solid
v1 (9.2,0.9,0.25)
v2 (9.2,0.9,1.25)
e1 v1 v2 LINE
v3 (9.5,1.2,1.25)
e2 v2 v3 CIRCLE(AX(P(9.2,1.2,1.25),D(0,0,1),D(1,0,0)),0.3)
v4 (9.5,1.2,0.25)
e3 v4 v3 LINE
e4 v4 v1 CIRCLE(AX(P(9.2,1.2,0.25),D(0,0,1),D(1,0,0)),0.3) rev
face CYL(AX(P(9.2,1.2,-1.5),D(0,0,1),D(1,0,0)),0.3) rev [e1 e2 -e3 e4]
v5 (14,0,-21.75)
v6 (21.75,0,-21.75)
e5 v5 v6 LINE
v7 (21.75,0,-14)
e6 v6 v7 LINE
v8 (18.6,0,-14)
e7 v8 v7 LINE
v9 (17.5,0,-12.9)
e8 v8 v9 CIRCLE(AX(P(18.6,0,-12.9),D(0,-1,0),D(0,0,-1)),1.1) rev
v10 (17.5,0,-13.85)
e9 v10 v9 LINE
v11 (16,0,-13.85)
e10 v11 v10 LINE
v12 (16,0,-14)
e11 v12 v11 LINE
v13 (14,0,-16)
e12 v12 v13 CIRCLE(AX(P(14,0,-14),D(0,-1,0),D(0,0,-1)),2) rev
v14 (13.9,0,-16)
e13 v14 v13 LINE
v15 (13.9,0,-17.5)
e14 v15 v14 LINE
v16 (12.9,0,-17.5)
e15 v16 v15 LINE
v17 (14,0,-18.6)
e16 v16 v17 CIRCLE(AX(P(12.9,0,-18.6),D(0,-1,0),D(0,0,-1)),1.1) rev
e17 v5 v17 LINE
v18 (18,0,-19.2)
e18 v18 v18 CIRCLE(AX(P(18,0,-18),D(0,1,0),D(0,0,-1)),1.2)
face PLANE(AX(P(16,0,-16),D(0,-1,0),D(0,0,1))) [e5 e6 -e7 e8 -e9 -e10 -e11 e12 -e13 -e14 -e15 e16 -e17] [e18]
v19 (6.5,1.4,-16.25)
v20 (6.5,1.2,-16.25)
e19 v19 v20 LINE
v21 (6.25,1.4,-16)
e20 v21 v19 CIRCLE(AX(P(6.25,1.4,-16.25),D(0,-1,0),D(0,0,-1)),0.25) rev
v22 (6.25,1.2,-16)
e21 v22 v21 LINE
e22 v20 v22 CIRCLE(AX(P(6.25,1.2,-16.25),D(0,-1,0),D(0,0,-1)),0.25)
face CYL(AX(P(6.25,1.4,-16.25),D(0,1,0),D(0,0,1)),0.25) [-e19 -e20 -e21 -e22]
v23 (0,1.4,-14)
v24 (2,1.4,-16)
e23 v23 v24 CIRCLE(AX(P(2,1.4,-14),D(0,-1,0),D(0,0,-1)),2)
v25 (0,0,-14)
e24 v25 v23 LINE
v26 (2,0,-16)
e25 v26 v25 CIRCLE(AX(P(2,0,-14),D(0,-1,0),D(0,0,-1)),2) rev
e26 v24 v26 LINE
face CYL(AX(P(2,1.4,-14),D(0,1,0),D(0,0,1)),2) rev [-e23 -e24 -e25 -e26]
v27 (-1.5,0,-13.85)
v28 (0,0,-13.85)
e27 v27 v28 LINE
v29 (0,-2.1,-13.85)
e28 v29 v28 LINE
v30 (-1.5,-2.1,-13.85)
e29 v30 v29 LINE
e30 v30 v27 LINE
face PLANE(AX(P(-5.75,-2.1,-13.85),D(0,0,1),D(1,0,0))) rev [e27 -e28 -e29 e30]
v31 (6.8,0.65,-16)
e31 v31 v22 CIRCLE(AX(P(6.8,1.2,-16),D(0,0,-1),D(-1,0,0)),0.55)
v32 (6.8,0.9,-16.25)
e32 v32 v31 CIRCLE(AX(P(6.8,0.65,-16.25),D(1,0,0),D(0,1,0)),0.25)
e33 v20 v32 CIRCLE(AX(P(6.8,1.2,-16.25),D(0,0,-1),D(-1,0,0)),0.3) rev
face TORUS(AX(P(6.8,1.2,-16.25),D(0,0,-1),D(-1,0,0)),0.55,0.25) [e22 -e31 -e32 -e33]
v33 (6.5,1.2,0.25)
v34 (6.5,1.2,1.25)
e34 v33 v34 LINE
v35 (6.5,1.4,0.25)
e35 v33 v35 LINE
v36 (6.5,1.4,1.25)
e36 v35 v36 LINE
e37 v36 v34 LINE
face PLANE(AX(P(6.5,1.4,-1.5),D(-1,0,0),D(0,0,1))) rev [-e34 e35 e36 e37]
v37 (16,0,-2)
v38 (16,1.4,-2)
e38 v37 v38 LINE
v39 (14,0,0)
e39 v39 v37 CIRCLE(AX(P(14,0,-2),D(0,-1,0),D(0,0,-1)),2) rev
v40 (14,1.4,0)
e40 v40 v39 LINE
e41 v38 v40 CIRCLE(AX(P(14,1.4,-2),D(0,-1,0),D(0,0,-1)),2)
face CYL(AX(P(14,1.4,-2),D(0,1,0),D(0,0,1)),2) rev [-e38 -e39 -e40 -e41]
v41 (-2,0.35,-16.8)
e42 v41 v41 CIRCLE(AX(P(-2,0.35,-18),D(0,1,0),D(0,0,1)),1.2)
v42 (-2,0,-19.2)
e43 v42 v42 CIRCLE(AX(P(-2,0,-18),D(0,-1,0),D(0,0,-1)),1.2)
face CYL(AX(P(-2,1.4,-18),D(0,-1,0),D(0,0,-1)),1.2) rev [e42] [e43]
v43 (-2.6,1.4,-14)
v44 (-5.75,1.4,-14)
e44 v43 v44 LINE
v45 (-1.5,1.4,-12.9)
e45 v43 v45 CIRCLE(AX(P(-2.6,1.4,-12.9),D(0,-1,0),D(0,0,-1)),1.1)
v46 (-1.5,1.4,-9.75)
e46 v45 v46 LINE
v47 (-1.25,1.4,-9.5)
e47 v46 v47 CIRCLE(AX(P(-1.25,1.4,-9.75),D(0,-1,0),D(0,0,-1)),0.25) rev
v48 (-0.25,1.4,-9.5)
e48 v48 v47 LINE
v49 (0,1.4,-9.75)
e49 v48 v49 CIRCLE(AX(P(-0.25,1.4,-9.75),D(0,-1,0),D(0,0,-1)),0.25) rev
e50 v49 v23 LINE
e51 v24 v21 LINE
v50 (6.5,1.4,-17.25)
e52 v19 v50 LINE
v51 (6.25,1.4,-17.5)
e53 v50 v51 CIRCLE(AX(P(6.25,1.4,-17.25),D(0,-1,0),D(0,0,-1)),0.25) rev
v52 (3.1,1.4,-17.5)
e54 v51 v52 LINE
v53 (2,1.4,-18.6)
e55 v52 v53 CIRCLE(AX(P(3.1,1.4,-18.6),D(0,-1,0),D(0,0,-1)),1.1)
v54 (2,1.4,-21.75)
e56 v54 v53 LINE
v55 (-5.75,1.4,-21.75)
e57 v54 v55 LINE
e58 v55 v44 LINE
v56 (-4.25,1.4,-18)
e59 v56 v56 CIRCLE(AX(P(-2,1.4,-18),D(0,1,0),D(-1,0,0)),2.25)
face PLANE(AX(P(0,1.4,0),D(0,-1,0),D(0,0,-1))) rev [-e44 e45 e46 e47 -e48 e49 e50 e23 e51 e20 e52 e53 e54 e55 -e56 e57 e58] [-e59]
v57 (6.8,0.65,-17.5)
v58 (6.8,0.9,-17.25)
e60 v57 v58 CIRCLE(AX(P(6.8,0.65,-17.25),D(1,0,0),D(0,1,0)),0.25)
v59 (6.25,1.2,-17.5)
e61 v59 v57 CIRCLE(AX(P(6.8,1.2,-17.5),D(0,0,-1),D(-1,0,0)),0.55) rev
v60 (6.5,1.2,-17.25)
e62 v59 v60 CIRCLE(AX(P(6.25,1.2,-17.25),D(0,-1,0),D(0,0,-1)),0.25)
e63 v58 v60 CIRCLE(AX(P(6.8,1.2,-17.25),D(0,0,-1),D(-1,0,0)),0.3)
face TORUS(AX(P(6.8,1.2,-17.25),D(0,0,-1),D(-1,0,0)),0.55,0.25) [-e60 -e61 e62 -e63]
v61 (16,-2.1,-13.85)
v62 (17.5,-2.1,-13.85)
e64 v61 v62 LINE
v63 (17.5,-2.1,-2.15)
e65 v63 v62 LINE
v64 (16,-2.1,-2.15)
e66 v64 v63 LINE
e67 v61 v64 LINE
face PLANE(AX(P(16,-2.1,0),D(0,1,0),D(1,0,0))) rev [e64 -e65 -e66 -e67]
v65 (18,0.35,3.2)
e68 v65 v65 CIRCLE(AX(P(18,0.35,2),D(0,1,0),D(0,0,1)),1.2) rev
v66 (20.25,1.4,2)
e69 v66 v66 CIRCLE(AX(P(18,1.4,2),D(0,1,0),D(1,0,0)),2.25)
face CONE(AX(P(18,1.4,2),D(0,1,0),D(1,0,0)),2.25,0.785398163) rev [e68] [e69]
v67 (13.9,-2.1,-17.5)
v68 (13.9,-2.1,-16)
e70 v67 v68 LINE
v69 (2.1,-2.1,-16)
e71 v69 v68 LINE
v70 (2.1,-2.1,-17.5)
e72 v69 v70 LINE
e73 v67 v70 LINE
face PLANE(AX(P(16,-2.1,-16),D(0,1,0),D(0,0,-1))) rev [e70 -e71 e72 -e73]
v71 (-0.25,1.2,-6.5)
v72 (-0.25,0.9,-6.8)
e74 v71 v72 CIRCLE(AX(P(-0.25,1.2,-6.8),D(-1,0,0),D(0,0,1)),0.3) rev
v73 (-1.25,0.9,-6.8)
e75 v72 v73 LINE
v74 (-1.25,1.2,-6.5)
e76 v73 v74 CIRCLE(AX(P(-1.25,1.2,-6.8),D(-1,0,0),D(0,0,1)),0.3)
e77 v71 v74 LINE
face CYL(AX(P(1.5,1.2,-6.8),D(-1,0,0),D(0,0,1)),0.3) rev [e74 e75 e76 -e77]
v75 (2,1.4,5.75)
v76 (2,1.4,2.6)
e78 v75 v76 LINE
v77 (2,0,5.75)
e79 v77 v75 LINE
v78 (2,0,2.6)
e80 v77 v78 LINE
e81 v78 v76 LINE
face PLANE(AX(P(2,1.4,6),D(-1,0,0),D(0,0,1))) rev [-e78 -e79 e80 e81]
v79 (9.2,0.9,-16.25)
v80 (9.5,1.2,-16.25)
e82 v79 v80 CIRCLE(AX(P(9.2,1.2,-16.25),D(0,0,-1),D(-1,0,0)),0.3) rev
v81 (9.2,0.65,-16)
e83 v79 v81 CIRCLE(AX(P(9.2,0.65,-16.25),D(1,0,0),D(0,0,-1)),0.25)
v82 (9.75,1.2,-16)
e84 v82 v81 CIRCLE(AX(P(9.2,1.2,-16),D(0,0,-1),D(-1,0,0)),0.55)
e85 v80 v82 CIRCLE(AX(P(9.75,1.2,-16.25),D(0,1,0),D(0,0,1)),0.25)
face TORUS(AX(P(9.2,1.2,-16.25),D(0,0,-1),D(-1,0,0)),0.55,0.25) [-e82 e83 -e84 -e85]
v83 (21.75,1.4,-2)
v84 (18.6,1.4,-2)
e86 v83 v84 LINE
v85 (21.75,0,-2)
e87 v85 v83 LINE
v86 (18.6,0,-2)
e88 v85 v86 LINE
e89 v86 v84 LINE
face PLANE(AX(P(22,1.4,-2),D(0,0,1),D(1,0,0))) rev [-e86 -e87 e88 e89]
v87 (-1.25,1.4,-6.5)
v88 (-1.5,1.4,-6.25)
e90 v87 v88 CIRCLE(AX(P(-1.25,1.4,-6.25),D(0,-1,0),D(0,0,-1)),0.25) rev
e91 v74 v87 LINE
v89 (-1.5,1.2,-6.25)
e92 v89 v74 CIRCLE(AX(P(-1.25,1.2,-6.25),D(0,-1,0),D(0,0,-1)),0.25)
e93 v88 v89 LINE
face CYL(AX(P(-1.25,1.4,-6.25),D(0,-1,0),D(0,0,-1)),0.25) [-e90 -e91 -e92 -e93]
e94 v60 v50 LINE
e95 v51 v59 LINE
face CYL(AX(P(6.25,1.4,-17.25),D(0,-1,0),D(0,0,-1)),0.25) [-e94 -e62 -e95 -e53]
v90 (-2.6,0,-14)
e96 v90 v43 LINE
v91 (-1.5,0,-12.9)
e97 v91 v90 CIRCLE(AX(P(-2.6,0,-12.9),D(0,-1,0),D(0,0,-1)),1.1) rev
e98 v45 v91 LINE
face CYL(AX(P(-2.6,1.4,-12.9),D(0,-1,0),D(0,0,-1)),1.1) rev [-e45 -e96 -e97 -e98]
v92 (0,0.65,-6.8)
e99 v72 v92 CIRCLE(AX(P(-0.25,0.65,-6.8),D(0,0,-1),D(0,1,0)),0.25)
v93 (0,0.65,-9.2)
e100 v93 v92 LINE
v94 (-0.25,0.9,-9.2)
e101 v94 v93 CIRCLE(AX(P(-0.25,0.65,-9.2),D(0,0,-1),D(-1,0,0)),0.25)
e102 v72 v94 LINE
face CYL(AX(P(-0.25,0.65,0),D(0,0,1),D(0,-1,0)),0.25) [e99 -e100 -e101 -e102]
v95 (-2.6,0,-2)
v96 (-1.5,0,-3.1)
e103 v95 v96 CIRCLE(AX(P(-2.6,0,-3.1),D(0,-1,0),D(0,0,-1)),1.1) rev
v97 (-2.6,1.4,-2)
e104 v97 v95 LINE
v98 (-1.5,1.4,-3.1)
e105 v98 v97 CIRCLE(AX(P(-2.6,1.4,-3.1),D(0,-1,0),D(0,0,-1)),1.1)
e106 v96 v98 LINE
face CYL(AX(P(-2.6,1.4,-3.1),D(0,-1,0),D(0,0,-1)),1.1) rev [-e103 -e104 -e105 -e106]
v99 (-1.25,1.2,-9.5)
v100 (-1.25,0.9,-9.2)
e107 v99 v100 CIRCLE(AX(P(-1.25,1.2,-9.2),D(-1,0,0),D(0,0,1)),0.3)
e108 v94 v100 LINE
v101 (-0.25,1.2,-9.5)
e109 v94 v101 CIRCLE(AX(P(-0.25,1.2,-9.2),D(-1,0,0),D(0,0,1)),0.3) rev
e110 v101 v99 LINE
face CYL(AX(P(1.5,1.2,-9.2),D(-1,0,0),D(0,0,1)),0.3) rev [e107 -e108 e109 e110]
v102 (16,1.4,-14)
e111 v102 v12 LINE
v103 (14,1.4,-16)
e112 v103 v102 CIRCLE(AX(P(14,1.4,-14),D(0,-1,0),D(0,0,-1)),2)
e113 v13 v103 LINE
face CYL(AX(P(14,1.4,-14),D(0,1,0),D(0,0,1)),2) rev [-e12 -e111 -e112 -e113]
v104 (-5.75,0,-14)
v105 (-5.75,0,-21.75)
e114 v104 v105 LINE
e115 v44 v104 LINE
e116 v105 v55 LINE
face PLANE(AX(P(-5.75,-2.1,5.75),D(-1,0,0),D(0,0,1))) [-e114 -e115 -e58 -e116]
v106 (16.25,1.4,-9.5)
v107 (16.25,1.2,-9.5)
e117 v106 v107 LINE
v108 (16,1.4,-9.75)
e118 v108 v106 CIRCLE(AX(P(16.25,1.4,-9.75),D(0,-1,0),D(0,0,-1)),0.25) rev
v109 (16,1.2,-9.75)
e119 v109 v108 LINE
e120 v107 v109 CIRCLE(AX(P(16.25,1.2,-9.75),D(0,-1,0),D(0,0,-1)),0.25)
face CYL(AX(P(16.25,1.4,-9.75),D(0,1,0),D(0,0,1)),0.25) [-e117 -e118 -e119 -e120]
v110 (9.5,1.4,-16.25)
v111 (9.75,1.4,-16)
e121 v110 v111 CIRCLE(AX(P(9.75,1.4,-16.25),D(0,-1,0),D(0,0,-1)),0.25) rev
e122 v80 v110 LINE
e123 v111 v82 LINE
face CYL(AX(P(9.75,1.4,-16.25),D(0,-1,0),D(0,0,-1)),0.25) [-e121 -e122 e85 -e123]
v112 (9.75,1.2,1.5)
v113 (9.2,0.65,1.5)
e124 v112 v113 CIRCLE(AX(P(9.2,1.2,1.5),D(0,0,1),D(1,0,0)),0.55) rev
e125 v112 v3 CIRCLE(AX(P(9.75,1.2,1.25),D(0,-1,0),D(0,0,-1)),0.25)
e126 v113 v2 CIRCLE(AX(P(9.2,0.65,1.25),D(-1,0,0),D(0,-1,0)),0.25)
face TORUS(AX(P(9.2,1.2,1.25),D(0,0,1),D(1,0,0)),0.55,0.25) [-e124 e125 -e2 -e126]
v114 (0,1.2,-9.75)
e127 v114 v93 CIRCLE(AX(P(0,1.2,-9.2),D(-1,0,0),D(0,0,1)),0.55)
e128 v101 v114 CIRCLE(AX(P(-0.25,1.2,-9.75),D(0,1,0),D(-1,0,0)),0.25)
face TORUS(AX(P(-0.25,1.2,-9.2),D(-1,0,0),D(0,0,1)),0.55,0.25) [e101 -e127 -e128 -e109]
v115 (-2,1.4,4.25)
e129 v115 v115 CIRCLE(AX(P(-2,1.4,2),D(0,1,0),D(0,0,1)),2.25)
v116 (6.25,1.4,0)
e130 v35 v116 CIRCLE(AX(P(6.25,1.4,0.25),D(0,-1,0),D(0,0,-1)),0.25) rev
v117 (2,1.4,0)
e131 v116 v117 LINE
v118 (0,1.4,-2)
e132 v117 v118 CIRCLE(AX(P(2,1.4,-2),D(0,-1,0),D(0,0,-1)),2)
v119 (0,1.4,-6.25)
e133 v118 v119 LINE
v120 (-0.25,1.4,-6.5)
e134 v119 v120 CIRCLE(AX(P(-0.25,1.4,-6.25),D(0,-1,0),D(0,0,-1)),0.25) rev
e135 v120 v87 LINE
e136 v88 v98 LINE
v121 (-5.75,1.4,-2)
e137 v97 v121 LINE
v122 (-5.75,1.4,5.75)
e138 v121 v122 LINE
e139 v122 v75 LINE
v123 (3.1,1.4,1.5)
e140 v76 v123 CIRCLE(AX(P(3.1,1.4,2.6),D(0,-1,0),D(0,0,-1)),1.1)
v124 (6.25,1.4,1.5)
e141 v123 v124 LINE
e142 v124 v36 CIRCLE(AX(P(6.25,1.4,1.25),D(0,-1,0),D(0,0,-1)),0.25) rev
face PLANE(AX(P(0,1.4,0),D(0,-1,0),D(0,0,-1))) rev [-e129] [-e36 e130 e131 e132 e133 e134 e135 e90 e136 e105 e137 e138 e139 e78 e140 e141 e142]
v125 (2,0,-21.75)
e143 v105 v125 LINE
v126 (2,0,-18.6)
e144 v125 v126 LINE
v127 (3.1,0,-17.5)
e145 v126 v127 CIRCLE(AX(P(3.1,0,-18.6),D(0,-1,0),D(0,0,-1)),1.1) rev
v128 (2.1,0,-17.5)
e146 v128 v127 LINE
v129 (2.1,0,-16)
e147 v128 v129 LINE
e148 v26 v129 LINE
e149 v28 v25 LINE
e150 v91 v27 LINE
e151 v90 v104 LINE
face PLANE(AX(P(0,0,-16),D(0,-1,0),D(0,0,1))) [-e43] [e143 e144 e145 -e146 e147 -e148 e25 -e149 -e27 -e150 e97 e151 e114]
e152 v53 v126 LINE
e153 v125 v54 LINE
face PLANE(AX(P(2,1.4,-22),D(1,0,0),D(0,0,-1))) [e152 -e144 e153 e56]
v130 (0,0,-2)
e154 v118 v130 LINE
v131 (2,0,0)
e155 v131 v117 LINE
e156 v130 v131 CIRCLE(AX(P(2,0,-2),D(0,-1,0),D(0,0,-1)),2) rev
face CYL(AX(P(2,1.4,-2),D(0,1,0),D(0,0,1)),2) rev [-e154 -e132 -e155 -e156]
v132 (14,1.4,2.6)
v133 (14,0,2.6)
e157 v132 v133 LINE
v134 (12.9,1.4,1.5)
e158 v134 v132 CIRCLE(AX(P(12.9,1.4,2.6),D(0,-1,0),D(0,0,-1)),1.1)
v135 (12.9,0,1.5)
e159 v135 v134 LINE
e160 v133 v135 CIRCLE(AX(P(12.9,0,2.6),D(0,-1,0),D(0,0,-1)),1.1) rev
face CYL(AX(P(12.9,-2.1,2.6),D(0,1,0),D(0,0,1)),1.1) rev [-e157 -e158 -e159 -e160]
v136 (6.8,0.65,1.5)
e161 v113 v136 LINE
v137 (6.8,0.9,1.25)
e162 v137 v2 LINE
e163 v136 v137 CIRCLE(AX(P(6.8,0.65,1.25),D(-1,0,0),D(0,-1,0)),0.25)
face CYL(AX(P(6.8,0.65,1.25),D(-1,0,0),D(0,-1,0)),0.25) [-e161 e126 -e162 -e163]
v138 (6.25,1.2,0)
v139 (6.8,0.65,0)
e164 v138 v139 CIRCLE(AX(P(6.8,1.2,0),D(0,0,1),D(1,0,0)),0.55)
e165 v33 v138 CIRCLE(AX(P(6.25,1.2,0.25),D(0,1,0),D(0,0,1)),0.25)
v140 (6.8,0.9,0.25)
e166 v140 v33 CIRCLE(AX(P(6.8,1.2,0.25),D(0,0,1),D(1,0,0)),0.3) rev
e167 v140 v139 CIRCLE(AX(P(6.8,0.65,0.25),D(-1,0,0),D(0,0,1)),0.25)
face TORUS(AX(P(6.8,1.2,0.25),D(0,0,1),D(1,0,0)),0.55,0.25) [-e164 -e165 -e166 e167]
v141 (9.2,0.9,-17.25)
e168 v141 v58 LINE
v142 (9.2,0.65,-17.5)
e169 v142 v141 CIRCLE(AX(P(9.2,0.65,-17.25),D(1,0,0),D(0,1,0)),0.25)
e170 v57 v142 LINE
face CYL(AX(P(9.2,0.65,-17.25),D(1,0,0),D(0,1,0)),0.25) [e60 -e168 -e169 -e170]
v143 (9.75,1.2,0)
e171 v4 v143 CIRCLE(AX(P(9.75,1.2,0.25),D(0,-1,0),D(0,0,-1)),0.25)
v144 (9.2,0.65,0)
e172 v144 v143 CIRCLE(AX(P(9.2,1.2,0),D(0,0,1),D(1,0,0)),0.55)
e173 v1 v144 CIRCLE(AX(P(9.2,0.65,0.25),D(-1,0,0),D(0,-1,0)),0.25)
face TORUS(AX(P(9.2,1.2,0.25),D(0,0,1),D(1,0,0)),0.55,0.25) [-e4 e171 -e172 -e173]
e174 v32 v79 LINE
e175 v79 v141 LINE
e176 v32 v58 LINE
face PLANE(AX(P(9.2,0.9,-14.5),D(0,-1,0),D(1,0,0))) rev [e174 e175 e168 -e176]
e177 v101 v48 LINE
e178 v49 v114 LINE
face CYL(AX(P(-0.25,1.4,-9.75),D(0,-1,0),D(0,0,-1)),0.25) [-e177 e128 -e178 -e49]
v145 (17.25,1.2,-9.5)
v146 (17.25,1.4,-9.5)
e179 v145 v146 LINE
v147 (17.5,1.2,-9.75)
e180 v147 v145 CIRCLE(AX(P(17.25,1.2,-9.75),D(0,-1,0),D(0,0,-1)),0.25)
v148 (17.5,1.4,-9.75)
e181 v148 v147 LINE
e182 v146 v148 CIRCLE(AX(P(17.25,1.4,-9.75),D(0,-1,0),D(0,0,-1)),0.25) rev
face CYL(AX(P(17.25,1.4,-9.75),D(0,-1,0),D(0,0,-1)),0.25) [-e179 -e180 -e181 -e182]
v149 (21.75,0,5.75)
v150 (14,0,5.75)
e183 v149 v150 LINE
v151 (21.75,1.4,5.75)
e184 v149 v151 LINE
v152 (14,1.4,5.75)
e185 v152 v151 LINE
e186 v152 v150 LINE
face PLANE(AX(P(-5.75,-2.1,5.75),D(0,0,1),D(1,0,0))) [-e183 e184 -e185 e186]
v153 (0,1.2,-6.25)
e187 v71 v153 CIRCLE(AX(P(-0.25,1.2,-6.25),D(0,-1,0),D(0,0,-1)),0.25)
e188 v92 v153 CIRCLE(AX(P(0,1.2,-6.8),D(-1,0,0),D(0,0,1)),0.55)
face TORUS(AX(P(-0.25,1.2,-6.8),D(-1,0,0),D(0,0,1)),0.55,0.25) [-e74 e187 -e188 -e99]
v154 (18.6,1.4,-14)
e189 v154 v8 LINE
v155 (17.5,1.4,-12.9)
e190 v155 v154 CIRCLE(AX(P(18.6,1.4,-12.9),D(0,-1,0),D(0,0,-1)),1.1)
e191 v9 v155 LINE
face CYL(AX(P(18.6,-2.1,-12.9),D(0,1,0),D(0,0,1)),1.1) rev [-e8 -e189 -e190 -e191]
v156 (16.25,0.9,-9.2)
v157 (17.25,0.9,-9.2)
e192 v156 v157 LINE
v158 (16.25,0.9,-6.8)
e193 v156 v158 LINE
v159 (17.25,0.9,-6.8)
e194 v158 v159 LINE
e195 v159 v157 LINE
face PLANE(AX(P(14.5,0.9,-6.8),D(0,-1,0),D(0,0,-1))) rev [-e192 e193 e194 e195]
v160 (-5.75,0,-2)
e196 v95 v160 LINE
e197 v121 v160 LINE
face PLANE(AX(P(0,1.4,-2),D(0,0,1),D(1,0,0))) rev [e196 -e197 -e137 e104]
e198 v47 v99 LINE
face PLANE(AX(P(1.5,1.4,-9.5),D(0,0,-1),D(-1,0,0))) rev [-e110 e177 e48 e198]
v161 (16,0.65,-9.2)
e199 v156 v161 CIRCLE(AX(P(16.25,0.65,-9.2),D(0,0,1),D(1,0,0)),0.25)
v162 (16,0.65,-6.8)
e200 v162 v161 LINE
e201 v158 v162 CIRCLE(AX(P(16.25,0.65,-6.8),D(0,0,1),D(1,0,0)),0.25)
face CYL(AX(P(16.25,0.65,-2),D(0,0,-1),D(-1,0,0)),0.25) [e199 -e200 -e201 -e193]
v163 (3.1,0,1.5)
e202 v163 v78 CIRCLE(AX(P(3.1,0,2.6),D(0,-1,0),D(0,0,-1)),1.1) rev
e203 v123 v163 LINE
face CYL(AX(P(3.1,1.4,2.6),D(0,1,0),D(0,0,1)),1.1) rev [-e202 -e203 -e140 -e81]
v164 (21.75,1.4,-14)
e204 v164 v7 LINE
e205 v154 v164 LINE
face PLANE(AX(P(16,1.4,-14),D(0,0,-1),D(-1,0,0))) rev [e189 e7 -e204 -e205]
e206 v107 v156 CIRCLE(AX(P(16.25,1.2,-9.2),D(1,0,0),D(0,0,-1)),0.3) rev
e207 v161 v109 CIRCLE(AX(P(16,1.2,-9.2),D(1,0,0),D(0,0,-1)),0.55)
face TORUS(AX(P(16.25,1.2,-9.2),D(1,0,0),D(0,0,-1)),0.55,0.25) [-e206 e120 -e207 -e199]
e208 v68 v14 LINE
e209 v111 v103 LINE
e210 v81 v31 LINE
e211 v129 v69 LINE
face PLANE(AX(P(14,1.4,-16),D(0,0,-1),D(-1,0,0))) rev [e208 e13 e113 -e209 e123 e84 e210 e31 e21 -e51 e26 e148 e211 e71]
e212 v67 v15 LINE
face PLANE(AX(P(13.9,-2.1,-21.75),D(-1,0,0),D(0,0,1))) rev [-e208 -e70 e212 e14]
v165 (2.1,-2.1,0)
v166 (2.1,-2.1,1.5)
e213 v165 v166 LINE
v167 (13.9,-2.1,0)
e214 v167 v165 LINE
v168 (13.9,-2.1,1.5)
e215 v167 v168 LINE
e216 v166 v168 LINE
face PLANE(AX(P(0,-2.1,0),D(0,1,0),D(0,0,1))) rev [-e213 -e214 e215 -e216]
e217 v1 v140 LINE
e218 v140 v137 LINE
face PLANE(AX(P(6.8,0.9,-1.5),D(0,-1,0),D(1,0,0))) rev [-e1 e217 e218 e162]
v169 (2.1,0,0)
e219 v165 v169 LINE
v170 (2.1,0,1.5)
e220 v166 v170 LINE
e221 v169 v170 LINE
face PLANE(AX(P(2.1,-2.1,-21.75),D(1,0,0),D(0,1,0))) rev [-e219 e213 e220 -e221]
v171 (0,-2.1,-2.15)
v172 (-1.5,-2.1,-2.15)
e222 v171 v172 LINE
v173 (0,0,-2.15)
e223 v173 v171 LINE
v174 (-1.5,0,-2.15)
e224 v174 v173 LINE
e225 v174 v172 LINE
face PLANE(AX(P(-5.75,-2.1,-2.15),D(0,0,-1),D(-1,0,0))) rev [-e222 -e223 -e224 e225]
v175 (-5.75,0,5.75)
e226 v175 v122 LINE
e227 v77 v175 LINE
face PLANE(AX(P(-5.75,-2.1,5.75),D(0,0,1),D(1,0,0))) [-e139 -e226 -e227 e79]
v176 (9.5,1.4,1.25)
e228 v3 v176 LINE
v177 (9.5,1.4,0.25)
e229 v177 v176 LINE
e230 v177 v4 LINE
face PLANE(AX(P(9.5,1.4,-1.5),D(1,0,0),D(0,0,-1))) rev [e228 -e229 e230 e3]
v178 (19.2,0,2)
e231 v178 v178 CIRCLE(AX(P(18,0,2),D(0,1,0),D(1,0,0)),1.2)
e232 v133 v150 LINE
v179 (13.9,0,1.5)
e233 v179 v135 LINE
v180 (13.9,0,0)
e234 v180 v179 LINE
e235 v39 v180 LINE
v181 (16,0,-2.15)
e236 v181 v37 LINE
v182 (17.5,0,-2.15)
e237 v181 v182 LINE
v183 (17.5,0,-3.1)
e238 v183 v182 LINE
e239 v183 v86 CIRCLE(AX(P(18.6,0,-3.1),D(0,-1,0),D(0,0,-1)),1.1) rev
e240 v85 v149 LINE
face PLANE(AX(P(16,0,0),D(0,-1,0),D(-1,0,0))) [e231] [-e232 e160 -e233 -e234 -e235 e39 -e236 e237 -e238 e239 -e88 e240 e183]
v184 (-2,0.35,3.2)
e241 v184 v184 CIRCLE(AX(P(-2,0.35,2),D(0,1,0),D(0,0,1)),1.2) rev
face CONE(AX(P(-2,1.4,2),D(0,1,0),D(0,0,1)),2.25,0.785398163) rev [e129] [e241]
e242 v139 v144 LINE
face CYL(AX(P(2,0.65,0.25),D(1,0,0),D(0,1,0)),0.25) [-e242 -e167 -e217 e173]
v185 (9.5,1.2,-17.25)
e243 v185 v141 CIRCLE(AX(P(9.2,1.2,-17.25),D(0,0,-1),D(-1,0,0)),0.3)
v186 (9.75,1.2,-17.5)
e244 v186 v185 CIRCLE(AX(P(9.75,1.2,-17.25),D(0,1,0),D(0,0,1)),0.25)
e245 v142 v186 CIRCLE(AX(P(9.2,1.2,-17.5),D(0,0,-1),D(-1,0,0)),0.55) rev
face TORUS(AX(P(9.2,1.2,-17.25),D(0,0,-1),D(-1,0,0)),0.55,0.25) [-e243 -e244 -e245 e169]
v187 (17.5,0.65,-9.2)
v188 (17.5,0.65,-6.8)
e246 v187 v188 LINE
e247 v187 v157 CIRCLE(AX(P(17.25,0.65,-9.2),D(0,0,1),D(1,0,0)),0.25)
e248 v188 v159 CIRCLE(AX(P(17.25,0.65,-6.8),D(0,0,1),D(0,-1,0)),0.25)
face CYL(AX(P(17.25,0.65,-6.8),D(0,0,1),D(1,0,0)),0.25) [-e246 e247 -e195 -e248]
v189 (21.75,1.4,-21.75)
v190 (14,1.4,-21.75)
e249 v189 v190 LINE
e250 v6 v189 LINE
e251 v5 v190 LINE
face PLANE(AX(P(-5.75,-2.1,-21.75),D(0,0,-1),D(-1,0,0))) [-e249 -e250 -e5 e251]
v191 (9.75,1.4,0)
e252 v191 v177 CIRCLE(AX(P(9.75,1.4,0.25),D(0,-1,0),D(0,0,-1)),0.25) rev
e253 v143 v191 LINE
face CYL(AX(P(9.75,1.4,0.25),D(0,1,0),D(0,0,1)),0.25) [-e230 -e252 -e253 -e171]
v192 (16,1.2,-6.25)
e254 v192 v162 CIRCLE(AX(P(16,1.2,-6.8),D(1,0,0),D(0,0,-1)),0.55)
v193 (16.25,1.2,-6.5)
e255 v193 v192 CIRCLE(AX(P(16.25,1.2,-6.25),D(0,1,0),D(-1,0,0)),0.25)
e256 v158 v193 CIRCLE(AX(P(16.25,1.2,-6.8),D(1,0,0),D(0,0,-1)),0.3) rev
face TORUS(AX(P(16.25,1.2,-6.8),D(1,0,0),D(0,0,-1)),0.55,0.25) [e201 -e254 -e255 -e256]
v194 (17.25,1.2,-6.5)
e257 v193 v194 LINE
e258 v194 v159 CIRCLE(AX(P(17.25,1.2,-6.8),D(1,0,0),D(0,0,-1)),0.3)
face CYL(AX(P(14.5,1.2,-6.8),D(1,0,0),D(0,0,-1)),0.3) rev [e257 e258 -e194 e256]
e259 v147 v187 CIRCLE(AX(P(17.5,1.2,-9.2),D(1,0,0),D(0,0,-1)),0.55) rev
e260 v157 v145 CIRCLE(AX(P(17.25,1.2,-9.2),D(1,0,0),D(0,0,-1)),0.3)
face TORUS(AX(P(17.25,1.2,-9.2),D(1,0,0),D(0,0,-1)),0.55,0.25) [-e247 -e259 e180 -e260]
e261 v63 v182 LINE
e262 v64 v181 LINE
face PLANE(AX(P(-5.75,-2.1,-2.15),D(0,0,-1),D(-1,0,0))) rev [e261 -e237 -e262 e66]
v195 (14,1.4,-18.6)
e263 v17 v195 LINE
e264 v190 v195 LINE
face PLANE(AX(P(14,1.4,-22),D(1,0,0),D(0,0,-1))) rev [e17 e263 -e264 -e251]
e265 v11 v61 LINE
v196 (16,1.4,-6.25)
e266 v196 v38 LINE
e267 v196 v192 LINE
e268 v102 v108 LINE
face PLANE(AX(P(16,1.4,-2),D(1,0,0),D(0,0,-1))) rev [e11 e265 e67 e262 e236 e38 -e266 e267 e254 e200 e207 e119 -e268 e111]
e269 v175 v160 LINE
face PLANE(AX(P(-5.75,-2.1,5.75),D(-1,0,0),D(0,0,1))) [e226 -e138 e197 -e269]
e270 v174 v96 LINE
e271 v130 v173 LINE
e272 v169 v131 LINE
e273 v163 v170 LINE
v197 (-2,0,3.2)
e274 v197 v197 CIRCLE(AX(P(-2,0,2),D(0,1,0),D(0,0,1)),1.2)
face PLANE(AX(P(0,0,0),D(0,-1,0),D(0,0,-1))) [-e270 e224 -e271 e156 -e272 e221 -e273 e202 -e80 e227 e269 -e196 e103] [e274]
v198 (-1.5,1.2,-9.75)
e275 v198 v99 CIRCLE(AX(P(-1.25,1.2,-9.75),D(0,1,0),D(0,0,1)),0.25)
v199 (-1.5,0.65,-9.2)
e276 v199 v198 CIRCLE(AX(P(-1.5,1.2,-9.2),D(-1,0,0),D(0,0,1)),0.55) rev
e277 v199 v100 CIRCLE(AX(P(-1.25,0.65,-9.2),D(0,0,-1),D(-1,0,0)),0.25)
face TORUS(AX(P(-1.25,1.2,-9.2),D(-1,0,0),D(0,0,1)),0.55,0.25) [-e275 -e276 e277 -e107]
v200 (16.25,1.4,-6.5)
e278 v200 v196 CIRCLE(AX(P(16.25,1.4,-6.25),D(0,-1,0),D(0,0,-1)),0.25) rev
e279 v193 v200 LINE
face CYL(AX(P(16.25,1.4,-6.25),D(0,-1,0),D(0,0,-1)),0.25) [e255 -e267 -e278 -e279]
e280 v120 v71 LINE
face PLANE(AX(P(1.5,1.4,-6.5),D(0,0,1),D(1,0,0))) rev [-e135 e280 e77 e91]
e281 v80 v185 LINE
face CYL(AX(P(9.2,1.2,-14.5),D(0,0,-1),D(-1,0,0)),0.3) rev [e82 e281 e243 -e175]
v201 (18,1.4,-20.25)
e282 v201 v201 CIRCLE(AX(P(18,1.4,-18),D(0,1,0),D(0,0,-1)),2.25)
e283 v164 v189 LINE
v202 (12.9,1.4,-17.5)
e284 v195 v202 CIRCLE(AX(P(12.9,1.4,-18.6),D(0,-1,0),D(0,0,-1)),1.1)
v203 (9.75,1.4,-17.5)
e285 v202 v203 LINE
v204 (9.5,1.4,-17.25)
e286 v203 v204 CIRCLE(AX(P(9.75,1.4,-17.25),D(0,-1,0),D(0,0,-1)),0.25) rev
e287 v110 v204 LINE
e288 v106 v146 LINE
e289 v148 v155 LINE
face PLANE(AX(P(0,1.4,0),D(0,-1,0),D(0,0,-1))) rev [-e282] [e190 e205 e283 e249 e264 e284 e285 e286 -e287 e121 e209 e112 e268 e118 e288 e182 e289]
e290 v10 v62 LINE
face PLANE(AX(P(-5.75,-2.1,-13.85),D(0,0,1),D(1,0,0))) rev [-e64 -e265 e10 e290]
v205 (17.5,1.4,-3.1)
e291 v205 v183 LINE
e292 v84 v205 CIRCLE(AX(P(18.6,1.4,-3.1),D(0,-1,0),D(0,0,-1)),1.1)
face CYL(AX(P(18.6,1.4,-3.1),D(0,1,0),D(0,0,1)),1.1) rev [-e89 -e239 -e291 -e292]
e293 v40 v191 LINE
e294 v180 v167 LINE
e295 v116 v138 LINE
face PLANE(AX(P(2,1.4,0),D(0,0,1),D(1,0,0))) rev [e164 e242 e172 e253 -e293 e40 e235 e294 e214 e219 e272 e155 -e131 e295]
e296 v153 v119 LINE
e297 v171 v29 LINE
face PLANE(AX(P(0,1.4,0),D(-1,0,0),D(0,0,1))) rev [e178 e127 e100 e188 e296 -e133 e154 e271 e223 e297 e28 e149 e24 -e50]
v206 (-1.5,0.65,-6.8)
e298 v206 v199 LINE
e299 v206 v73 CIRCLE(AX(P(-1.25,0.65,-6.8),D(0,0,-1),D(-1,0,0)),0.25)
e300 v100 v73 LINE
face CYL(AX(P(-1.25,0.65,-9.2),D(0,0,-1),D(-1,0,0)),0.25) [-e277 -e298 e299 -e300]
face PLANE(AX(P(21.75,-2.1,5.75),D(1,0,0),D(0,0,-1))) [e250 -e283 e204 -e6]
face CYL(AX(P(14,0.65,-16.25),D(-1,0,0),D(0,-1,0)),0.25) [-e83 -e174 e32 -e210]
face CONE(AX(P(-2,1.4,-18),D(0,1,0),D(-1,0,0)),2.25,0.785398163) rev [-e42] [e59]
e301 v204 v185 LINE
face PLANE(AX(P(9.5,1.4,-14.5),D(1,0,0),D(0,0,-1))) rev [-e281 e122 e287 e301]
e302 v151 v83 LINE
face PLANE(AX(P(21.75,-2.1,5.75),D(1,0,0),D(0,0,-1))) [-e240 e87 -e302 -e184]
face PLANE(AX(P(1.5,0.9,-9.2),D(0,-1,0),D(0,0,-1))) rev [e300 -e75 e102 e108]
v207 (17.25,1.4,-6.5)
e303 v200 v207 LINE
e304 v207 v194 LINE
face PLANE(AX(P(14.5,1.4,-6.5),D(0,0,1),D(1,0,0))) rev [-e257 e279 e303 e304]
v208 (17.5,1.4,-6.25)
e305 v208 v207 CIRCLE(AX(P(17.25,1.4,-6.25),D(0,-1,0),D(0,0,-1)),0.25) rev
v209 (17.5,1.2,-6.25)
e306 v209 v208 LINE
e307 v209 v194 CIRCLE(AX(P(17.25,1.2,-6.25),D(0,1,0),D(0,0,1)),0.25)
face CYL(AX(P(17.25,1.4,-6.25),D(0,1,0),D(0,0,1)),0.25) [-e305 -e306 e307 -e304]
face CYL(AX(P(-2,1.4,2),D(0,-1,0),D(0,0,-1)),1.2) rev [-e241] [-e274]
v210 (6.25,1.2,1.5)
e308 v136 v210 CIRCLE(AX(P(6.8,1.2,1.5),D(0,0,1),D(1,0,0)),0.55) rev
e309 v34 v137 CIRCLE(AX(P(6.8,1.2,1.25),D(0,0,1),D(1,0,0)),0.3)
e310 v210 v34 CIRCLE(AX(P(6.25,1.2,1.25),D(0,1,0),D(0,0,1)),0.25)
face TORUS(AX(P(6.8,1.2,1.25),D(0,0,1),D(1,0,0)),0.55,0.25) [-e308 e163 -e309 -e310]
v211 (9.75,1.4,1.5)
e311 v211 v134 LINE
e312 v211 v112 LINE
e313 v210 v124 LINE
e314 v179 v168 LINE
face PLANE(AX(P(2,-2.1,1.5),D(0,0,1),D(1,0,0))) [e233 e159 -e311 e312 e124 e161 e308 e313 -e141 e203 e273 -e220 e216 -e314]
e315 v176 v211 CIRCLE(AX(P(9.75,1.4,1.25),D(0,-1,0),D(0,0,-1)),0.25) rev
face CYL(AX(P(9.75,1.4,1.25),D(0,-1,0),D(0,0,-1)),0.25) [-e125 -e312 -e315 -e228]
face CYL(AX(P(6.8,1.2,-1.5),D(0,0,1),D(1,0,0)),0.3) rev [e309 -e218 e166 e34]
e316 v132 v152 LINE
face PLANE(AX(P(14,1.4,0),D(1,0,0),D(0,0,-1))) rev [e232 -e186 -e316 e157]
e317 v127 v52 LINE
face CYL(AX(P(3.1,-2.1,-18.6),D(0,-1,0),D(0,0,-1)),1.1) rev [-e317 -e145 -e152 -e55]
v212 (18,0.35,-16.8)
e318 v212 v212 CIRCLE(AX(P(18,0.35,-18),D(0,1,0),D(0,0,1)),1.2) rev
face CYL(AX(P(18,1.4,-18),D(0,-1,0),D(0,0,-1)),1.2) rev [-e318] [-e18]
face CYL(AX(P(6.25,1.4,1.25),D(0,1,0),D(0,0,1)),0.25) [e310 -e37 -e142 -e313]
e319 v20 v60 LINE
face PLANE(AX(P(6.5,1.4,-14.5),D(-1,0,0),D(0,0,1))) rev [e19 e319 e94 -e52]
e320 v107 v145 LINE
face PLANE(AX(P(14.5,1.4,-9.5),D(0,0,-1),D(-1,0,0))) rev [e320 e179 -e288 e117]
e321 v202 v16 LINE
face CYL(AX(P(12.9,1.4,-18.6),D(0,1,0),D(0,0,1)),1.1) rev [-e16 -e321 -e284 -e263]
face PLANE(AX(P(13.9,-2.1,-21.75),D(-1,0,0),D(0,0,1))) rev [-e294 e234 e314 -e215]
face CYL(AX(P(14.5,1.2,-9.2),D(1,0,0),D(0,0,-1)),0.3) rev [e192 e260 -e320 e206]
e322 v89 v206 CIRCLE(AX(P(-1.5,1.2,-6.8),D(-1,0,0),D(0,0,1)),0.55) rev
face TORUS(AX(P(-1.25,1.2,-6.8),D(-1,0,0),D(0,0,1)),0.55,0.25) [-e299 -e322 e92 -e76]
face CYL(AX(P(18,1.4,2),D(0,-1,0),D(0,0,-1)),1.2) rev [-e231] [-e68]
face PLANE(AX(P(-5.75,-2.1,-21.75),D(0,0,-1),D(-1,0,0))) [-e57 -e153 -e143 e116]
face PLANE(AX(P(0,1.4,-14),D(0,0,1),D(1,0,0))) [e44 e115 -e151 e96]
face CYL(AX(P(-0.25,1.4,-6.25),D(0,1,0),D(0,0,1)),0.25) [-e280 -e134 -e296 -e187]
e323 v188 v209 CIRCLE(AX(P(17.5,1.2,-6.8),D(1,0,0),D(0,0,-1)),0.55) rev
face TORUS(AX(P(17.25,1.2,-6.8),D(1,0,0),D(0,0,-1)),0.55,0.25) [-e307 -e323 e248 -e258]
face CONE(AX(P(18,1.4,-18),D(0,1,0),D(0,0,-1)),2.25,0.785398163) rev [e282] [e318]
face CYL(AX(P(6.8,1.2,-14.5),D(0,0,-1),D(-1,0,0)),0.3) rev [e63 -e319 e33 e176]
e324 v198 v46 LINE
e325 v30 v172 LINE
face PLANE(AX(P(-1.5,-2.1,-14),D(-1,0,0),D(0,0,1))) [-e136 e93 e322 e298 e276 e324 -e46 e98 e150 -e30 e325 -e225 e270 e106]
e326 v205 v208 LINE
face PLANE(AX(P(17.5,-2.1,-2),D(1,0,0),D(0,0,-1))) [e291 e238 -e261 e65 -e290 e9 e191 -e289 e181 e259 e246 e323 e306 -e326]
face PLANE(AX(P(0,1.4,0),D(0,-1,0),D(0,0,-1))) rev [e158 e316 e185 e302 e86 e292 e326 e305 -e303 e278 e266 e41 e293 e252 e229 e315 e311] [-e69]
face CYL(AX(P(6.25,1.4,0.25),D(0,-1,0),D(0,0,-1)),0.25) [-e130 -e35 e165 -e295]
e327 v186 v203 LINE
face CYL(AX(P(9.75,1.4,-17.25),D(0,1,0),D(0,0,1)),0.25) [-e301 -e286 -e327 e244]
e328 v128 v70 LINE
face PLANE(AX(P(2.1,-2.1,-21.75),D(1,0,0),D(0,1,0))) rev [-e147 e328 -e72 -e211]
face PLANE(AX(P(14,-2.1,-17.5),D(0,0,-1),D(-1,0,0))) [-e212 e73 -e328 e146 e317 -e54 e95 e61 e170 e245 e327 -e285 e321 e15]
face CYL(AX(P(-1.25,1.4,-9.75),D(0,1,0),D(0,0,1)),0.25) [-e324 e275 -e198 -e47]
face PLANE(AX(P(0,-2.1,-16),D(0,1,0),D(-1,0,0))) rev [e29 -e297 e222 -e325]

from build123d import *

# Parameters (mm, degrees)
SKETCH1_R                   = 1.2
BOSS_EXTRUDE1_DEPTH         = 1.4
SKETCH2_R                   = 2.25
CUT_EXTRUDE1_DEPTH          = 1.1
CUT_EXTRUDE1_DRAFT          = -45
SKETCH3_W                   = 12
SKETCH3_H                   = 1.5
BOSS_EXTRUDE2_DEPTH         = 3.5
CIRPATTERN1_COUNT           = 2
CIRPATTERN1_ANGLE           = 90
CIRPATTERN1_COPY_1_SKETCH_R = 2.25
CIRPATTERN1_COPY_1_DEPTH    = 1.1
CIRPATTERN1_COPY_1_DRAFT    = -45
CIRPATTERN2_OUTLINE_R       = 2.25
CIRPATTERN2_OUTLINE_R_2     = 1.2
CIRPATTERN2_DEPTH           = 1.4
CIRPATTERN2_START           = -2.1
CIRPATTERN2_2_OUTLINE_W     = 12
CIRPATTERN2_2_OUTLINE_H     = 1.5
CIRPATTERN2_2_OUTLINE_W_2   = 1.5
CIRPATTERN2_2_OUTLINE_H_2   = 12
CIRPATTERN2_2_DEPTH         = 2.1
CIRPATTERN3_COPY_1_SKETCH_R = 2.25
CIRPATTERN3_COPY_1_DEPTH    = 1.1
CIRPATTERN3_COPY_1_DRAFT    = -45
CIRPATTERN3_COPY_2_SKETCH_R = 2.25
CIRPATTERN3_COPY_2_DEPTH    = 1.1
CIRPATTERN3_COPY_2_DRAFT    = -45
CIRPATTERN3_COPY_3_SKETCH_R = 2.25
CIRPATTERN3_COPY_3_DEPTH    = 1.1
CIRPATTERN3_COPY_3_DRAFT    = -45
CUT_EXTRUDE2_DEPTH          = 3
CIRPATTERN4_COUNT           = 4
FILLET2_R                   = 0.25
CUT_EXTRUDE3_DEPTH          = 32.183489221
CUT_EXTRUDE3_DEPTH_BACK     = 32.183489221
SKETCH5_W                   = 28
SKETCH5_H                   = 28
SKETCH5_W_2                 = 27.5
SKETCH5_H_2                 = 27.5
FILLET3_R                   = 2
FILLET4_R                   = 1.1
CUT_EXTRUDE4_DEPTH          = 31.830747639
CUT_EXTRUDE4_DEPTH_BACK     = 31.830747639
SKETCH6_W                   = 0.1
SKETCH6_H                   = 2.1
CUT_EXTRUDE5_DEPTH          = 31.830747639
CUT_EXTRUDE5_DEPTH_BACK     = 31.830747639
SKETCH7_W                   = 0.15
SKETCH7_H                   = 2.1


with BuildPart() as part:
    # Sketch1 → Boss-Extrude1 (new body)
    with BuildSketch(Plane(origin=(0, 0, 0), x_dir=(1, 0, 0), z_dir=(0, 1, 0))):
        Polygon((0, 0), (0, 2), (-6, 2), (-6, -6), (2, -6), (2, 0), align=None)
        with Locations(Location((-2, -2, 0), (0, 0, 270))):
            Circle(SKETCH1_R, mode=Mode.SUBTRACT)
    boss_extrude1 = extrude(amount=BOSS_EXTRUDE1_DEPTH)


with BuildPart() as cut_extrude1_tool:
    # Sketch2 → Cut-Extrude1 (with draft: the straight prism first)
    with BuildSketch(Plane(origin=(0, 1.4, 0), x_dir=(1, 0, 0), z_dir=(0, 1, 0))):
        with Locations((-2, -2)):
            Circle(SKETCH2_R)
    extrude(amount=-CUT_EXTRUDE1_DEPTH)
    # Cut-Extrude1: the draft: its side faces are tilted about the plane it starts from
    cut_extrude1_sides = [cut_extrude1_tool.faces().sort_by_distance(p)[0] for p in [
        (-4.25, 0.85, 2),
    ]]
    draft(cut_extrude1_sides, Plane(origin=(0, 1.4, 0), x_dir=(1, 0, 0), z_dir=(0, 1, 0)), CUT_EXTRUDE1_DRAFT)


with BuildPart() as part_1:
    add(part.part)

    # Cut-Extrude1: cut by cut_extrude1_tool
    add(cut_extrude1_tool.part, mode=Mode.SUBTRACT)

    # Sketch3 → Boss-Extrude2 (add)
    with BuildSketch(Plane(origin=(0, 1.4, 0), x_dir=(1, 0, 0), z_dir=(0, 1, 0))):
        with Locations((8, -0.75)):
            Rectangle(SKETCH3_W, SKETCH3_H)
    boss_extrude2 = extrude(amount=-BOSS_EXTRUDE2_DEPTH)

    # CirPattern1: Boss-Extrude1, Boss-Extrude2 ×2 about axis
    cirpattern1_axis = Axis((8, 0, -8), (0, 1, 0))
    add([boss_extrude1.rotate(cirpattern1_axis, i * CIRPATTERN1_ANGLE / (CIRPATTERN1_COUNT - 1)) for i in range(1, CIRPATTERN1_COUNT)])
    add([boss_extrude2.rotate(cirpattern1_axis, i * CIRPATTERN1_ANGLE / (CIRPATTERN1_COUNT - 1)) for i in range(1, CIRPATTERN1_COUNT)])


with BuildPart() as cirpattern1_copy_1_tool:
    # CirPattern1 copy 1 sketch → CirPattern1 copy 1 (with draft: the straight prism first)
    with BuildSketch(Plane(origin=(16, 1.4, 0), x_dir=(0, 0, -1), z_dir=(0, 1, 0))):
        with Locations((-2, -2)):
            Circle(CIRPATTERN1_COPY_1_SKETCH_R)
    extrude(amount=-CIRPATTERN1_COPY_1_DEPTH)
    # CirPattern1 copy 1: the draft: its side faces are tilted about the plane it starts from
    cirpattern1_copy_1_sides = [cirpattern1_copy_1_tool.faces().sort_by_distance(p)[0] for p in [
        (18, 0.85, 4.25),
    ]]
    draft(cirpattern1_copy_1_sides, Plane(origin=(16, 1.4, 0), x_dir=(0, 0, -1), z_dir=(0, 1, 0)), CIRPATTERN1_COPY_1_DRAFT)


with BuildPart() as part_2:
    add(part_1.part)

    # CirPattern1 copy 1: cut by cirpattern1_copy_1_tool
    add(cirpattern1_copy_1_tool.part, mode=Mode.SUBTRACT)

    # CirPattern2: read off the stored shape, not the designer's step
    # CirPattern2 outline → CirPattern2 (add)
    with BuildSketch(Plane(origin=(0, 0, 0), x_dir=(1, 0, 0), z_dir=(0, 1, 0))):
        Polygon((22, -6), (22, 2), (17.5, 2), (17.5, 14), (22, 14), (22, 22), (14, 22), (14, 17.5), (2, 17.5), (2, 16), (16, 16), (16, 0), (0, 0), (0, 14), (-1.5, 14), (-1.5, 2), (-6, 2), (-6, -6), (2, -6), (2, -1.5), (14, -1.5), (14, -6), align=None)
        with Locations((-2, -2)):
            Circle(CIRPATTERN2_OUTLINE_R, mode=Mode.SUBTRACT)
        with Locations((18, -2)):
            Circle(CIRPATTERN2_OUTLINE_R_2, mode=Mode.SUBTRACT)
        with Locations((18, 18)):
            Circle(CIRPATTERN2_OUTLINE_R_2, mode=Mode.SUBTRACT)
    extrude(amount=CIRPATTERN2_DEPTH)

    # CirPattern2 2 outline → CirPattern2 2 (add)
    with BuildSketch(Plane(origin=(0, 0, 0), x_dir=(1, 0, 0), z_dir=(0, 1, 0)).offset(CIRPATTERN2_START)):
        with Locations((8, 16.75)):
            Rectangle(CIRPATTERN2_2_OUTLINE_W, CIRPATTERN2_2_OUTLINE_H)
        with Locations((-0.75, 8)):
            Rectangle(CIRPATTERN2_2_OUTLINE_W_2, CIRPATTERN2_2_OUTLINE_H_2)
    extrude(amount=CIRPATTERN2_2_DEPTH)

    # Mirror1: Boss-Extrude1 across plane
    add(boss_extrude1.mirror(Plane(origin=(0, 0, -8), x_dir=(1, 0, 0), z_dir=(0, 0, -1))))


with BuildPart() as cirpattern3_copy_1_tool:
    # CirPattern3 copy 1 sketch → CirPattern3 copy 1 (with draft: the straight prism first)
    with BuildSketch(Plane(origin=(16, 1.4, 0), x_dir=(0, 0, -1), z_dir=(0, 1, 0))):
        with Locations((-2, -2)):
            Circle(CIRPATTERN3_COPY_1_SKETCH_R)
    extrude(amount=-CIRPATTERN3_COPY_1_DEPTH)
    # CirPattern3 copy 1: the draft: its side faces are tilted about the plane it starts from
    cirpattern3_copy_1_sides = [cirpattern3_copy_1_tool.faces().sort_by_distance(p)[0] for p in [
        (18, 0.85, 4.25),
    ]]
    draft(cirpattern3_copy_1_sides, Plane(origin=(16, 1.4, 0), x_dir=(0, 0, -1), z_dir=(0, 1, 0)), CIRPATTERN3_COPY_1_DRAFT)


with BuildPart() as part_3:
    add(part_2.part)

    # CirPattern3 copy 1: cut by cirpattern3_copy_1_tool
    add(cirpattern3_copy_1_tool.part, mode=Mode.SUBTRACT)


with BuildPart() as cirpattern3_copy_2_tool:
    # CirPattern3 copy 2 sketch → CirPattern3 copy 2 (with draft: the straight prism first)
    with BuildSketch(Plane(origin=(16, 1.4, -16), x_dir=(-1, 0, 0), z_dir=(0, 1, 0))):
        with Locations((-2, -2)):
            Circle(CIRPATTERN3_COPY_2_SKETCH_R)
    extrude(amount=-CIRPATTERN3_COPY_2_DEPTH)
    # CirPattern3 copy 2: the draft: its side faces are tilted about the plane it starts from
    cirpattern3_copy_2_sides = [cirpattern3_copy_2_tool.faces().sort_by_distance(p)[0] for p in [
        (20.25, 0.85, -18),
    ]]
    draft(cirpattern3_copy_2_sides, Plane(origin=(16, 1.4, -16), x_dir=(-1, 0, 0), z_dir=(0, 1, 0)), CIRPATTERN3_COPY_2_DRAFT)


with BuildPart() as part_4:
    add(part_3.part)

    # CirPattern3 copy 2: cut by cirpattern3_copy_2_tool
    add(cirpattern3_copy_2_tool.part, mode=Mode.SUBTRACT)


with BuildPart() as cirpattern3_copy_3_tool:
    # CirPattern3 copy 3 sketch → CirPattern3 copy 3 (with draft: the straight prism first)
    with BuildSketch(Plane(origin=(0, 1.4, -16), x_dir=(0, 0, 1), z_dir=(0, 1, 0))):
        with Locations((-2, -2)):
            Circle(CIRPATTERN3_COPY_3_SKETCH_R)
    extrude(amount=-CIRPATTERN3_COPY_3_DEPTH)
    # CirPattern3 copy 3: the draft: its side faces are tilted about the plane it starts from
    cirpattern3_copy_3_sides = [cirpattern3_copy_3_tool.faces().sort_by_distance(p)[0] for p in [
        (-2, 0.85, -20.25),
    ]]
    draft(cirpattern3_copy_3_sides, Plane(origin=(0, 1.4, -16), x_dir=(0, 0, 1), z_dir=(0, 1, 0)), CIRPATTERN3_COPY_3_DRAFT)


with BuildPart() as part_5:
    add(part_4.part)

    # CirPattern3 copy 3: cut by cirpattern3_copy_3_tool
    add(cirpattern3_copy_3_tool.part, mode=Mode.SUBTRACT)

    # Sketch4 → Cut-Extrude2 (cut)
    with BuildSketch(Plane.XY.offset(1.5)):
        with BuildLine():
            Line((6.5, 1.4), (9.5, 1.4))
            Line((9.5, 1.4), (9.5, 1.2))
            ThreePointArc((9.5, 1.2), (9.412132034, 0.987867966), (9.2, 0.9))
            Line((9.2, 0.9), (6.8, 0.9))
            ThreePointArc((6.8, 0.9), (6.587867966, 0.987867966), (6.5, 1.2))
            Line((6.5, 1.2), (6.5, 1.4))
        make_face()
    cut_extrude2 = extrude(amount=-CUT_EXTRUDE2_DEPTH, mode=Mode.SUBTRACT)

    # CirPattern4: Cut-Extrude2 ×4 about axis
    cirpattern4_axis = Axis((8, 0, -8), (0, 1, 0))
    for i in range(1, CIRPATTERN4_COUNT):
        add(cut_extrude2.rotate(cirpattern4_axis, i * 360 / CIRPATTERN4_COUNT), mode=Mode.SUBTRACT)

    # Fillet2
    fillet2_edges = [part_5.edges().sort_by_distance(p)[0] for p in [
        (6.5, 1.3, 0),
        (9.5, 1.3, 0),
        (9.412132034, 0.987867966, 0),
        (8, 0.9, 0),
        (6.587867966, 0.987867966, 0),
        (6.5, 1.3, 1.5),
        (6.587867966, 0.987867966, 1.5),
        (8, 0.9, 1.5),
        (9.412132034, 0.987867966, 1.5),
        (9.5, 1.3, 1.5),
        (16, 1.3, -6.5),
        (16, 1.3, -9.5),
        (16, 0.987867966, -9.412132034),
        (16, 0.9, -8),
        (16, 0.987867966, -6.587867966),
        (17.5, 1.3, -6.5),
        (17.5, 0.987867966, -6.587867966),
        (17.5, 0.9, -8),
        (17.5, 0.987867966, -9.412132034),
        (17.5, 1.3, -9.5),
        (9.5, 1.3, -16),
        (6.5, 1.3, -16),
        (6.587867966, 0.987867966, -16),
        (8, 0.9, -16),
        (9.412132034, 0.987867966, -16),
        (9.5, 1.3, -17.5),
        (9.412132034, 0.987867966, -17.5),
        (8, 0.9, -17.5),
        (6.587867966, 0.987867966, -17.5),
        (6.5, 1.3, -17.5),
        (0, 1.3, -9.5),
        (0, 1.3, -6.5),
        (0, 0.987867966, -6.587867966),
        (0, 0.9, -8),
        (0, 0.987867966, -9.412132034),
        (-1.5, 1.3, -9.5),
        (-1.5, 0.987867966, -9.412132034),
        (-1.5, 0.9, -8),
        (-1.5, 0.987867966, -6.587867966),
        (-1.5, 1.3, -6.5),
    ]]
    fillet(fillet2_edges, radius=FILLET2_R)

    # Sketch5 → Cut-Extrude3 (cut, two sides: drawn at the far end of the back side and taken through both)
    with BuildSketch(Plane(origin=(0, 0, 0), x_dir=(1, 0, 0), z_dir=(0, 1, 0)).offset(-CUT_EXTRUDE3_DEPTH_BACK)):
        with Locations((8, 8)):
            Rectangle(SKETCH5_W, SKETCH5_H)
        with Locations((8, 8)):
            Rectangle(SKETCH5_W_2, SKETCH5_H_2, mode=Mode.SUBTRACT)
    extrude(amount=CUT_EXTRUDE3_DEPTH + CUT_EXTRUDE3_DEPTH_BACK, mode=Mode.SUBTRACT)

    # Fillet3
    fillet3_edges = [part_5.edges().sort_by_distance(p)[0] for p in [
        (16, 0.7, -16),
        (0, 0.7, 0),
        (0, 0.7, -16),
        (16, 0.7, 0),
    ]]
    fillet(fillet3_edges, radius=FILLET3_R)

    # Fillet4
    fillet4_edges = [part_5.edges().sort_by_distance(p)[0] for p in [
        (17.5, 0.7, -14),
        (14, 0.7, -17.5),
        (-1.5, 0.7, -2),
        (-1.5, 0.7, -14),
        (2, 0.7, -17.5),
        (2, 0.7, 1.5),
        (14, 0.7, 1.5),
        (17.5, 0.7, -2),
    ]]
    fillet(fillet4_edges, radius=FILLET4_R)

    # Sketch6 → Cut-Extrude4 (cut, two sides: drawn at the far end of the back side and taken through both)
    with BuildSketch(Plane.XY.offset(-CUT_EXTRUDE4_DEPTH_BACK)):
        with Locations((13.95, -1.05)):
            Rectangle(SKETCH6_W, SKETCH6_H)
        with Locations((2.05, -1.05)):
            Rectangle(SKETCH6_W, SKETCH6_H)
    extrude(amount=CUT_EXTRUDE4_DEPTH + CUT_EXTRUDE4_DEPTH_BACK, mode=Mode.SUBTRACT)

    # Sketch7 → Cut-Extrude5 (cut, two sides: drawn at the far end of the back side and taken through both)
    with BuildSketch(Plane(origin=(0, 0, 0), x_dir=(0, 0, -1), z_dir=(1, 0, 0)).offset(-CUT_EXTRUDE5_DEPTH_BACK)):
        with Locations((2.075, -1.05)):
            Rectangle(SKETCH7_W, SKETCH7_H)
        with Locations((13.925, -1.05)):
            Rectangle(SKETCH7_W, SKETCH7_H)
    extrude(amount=CUT_EXTRUDE5_DEPTH + CUT_EXTRUDE5_DEPTH_BACK, mode=Mode.SUBTRACT)


solid = part_5.part
